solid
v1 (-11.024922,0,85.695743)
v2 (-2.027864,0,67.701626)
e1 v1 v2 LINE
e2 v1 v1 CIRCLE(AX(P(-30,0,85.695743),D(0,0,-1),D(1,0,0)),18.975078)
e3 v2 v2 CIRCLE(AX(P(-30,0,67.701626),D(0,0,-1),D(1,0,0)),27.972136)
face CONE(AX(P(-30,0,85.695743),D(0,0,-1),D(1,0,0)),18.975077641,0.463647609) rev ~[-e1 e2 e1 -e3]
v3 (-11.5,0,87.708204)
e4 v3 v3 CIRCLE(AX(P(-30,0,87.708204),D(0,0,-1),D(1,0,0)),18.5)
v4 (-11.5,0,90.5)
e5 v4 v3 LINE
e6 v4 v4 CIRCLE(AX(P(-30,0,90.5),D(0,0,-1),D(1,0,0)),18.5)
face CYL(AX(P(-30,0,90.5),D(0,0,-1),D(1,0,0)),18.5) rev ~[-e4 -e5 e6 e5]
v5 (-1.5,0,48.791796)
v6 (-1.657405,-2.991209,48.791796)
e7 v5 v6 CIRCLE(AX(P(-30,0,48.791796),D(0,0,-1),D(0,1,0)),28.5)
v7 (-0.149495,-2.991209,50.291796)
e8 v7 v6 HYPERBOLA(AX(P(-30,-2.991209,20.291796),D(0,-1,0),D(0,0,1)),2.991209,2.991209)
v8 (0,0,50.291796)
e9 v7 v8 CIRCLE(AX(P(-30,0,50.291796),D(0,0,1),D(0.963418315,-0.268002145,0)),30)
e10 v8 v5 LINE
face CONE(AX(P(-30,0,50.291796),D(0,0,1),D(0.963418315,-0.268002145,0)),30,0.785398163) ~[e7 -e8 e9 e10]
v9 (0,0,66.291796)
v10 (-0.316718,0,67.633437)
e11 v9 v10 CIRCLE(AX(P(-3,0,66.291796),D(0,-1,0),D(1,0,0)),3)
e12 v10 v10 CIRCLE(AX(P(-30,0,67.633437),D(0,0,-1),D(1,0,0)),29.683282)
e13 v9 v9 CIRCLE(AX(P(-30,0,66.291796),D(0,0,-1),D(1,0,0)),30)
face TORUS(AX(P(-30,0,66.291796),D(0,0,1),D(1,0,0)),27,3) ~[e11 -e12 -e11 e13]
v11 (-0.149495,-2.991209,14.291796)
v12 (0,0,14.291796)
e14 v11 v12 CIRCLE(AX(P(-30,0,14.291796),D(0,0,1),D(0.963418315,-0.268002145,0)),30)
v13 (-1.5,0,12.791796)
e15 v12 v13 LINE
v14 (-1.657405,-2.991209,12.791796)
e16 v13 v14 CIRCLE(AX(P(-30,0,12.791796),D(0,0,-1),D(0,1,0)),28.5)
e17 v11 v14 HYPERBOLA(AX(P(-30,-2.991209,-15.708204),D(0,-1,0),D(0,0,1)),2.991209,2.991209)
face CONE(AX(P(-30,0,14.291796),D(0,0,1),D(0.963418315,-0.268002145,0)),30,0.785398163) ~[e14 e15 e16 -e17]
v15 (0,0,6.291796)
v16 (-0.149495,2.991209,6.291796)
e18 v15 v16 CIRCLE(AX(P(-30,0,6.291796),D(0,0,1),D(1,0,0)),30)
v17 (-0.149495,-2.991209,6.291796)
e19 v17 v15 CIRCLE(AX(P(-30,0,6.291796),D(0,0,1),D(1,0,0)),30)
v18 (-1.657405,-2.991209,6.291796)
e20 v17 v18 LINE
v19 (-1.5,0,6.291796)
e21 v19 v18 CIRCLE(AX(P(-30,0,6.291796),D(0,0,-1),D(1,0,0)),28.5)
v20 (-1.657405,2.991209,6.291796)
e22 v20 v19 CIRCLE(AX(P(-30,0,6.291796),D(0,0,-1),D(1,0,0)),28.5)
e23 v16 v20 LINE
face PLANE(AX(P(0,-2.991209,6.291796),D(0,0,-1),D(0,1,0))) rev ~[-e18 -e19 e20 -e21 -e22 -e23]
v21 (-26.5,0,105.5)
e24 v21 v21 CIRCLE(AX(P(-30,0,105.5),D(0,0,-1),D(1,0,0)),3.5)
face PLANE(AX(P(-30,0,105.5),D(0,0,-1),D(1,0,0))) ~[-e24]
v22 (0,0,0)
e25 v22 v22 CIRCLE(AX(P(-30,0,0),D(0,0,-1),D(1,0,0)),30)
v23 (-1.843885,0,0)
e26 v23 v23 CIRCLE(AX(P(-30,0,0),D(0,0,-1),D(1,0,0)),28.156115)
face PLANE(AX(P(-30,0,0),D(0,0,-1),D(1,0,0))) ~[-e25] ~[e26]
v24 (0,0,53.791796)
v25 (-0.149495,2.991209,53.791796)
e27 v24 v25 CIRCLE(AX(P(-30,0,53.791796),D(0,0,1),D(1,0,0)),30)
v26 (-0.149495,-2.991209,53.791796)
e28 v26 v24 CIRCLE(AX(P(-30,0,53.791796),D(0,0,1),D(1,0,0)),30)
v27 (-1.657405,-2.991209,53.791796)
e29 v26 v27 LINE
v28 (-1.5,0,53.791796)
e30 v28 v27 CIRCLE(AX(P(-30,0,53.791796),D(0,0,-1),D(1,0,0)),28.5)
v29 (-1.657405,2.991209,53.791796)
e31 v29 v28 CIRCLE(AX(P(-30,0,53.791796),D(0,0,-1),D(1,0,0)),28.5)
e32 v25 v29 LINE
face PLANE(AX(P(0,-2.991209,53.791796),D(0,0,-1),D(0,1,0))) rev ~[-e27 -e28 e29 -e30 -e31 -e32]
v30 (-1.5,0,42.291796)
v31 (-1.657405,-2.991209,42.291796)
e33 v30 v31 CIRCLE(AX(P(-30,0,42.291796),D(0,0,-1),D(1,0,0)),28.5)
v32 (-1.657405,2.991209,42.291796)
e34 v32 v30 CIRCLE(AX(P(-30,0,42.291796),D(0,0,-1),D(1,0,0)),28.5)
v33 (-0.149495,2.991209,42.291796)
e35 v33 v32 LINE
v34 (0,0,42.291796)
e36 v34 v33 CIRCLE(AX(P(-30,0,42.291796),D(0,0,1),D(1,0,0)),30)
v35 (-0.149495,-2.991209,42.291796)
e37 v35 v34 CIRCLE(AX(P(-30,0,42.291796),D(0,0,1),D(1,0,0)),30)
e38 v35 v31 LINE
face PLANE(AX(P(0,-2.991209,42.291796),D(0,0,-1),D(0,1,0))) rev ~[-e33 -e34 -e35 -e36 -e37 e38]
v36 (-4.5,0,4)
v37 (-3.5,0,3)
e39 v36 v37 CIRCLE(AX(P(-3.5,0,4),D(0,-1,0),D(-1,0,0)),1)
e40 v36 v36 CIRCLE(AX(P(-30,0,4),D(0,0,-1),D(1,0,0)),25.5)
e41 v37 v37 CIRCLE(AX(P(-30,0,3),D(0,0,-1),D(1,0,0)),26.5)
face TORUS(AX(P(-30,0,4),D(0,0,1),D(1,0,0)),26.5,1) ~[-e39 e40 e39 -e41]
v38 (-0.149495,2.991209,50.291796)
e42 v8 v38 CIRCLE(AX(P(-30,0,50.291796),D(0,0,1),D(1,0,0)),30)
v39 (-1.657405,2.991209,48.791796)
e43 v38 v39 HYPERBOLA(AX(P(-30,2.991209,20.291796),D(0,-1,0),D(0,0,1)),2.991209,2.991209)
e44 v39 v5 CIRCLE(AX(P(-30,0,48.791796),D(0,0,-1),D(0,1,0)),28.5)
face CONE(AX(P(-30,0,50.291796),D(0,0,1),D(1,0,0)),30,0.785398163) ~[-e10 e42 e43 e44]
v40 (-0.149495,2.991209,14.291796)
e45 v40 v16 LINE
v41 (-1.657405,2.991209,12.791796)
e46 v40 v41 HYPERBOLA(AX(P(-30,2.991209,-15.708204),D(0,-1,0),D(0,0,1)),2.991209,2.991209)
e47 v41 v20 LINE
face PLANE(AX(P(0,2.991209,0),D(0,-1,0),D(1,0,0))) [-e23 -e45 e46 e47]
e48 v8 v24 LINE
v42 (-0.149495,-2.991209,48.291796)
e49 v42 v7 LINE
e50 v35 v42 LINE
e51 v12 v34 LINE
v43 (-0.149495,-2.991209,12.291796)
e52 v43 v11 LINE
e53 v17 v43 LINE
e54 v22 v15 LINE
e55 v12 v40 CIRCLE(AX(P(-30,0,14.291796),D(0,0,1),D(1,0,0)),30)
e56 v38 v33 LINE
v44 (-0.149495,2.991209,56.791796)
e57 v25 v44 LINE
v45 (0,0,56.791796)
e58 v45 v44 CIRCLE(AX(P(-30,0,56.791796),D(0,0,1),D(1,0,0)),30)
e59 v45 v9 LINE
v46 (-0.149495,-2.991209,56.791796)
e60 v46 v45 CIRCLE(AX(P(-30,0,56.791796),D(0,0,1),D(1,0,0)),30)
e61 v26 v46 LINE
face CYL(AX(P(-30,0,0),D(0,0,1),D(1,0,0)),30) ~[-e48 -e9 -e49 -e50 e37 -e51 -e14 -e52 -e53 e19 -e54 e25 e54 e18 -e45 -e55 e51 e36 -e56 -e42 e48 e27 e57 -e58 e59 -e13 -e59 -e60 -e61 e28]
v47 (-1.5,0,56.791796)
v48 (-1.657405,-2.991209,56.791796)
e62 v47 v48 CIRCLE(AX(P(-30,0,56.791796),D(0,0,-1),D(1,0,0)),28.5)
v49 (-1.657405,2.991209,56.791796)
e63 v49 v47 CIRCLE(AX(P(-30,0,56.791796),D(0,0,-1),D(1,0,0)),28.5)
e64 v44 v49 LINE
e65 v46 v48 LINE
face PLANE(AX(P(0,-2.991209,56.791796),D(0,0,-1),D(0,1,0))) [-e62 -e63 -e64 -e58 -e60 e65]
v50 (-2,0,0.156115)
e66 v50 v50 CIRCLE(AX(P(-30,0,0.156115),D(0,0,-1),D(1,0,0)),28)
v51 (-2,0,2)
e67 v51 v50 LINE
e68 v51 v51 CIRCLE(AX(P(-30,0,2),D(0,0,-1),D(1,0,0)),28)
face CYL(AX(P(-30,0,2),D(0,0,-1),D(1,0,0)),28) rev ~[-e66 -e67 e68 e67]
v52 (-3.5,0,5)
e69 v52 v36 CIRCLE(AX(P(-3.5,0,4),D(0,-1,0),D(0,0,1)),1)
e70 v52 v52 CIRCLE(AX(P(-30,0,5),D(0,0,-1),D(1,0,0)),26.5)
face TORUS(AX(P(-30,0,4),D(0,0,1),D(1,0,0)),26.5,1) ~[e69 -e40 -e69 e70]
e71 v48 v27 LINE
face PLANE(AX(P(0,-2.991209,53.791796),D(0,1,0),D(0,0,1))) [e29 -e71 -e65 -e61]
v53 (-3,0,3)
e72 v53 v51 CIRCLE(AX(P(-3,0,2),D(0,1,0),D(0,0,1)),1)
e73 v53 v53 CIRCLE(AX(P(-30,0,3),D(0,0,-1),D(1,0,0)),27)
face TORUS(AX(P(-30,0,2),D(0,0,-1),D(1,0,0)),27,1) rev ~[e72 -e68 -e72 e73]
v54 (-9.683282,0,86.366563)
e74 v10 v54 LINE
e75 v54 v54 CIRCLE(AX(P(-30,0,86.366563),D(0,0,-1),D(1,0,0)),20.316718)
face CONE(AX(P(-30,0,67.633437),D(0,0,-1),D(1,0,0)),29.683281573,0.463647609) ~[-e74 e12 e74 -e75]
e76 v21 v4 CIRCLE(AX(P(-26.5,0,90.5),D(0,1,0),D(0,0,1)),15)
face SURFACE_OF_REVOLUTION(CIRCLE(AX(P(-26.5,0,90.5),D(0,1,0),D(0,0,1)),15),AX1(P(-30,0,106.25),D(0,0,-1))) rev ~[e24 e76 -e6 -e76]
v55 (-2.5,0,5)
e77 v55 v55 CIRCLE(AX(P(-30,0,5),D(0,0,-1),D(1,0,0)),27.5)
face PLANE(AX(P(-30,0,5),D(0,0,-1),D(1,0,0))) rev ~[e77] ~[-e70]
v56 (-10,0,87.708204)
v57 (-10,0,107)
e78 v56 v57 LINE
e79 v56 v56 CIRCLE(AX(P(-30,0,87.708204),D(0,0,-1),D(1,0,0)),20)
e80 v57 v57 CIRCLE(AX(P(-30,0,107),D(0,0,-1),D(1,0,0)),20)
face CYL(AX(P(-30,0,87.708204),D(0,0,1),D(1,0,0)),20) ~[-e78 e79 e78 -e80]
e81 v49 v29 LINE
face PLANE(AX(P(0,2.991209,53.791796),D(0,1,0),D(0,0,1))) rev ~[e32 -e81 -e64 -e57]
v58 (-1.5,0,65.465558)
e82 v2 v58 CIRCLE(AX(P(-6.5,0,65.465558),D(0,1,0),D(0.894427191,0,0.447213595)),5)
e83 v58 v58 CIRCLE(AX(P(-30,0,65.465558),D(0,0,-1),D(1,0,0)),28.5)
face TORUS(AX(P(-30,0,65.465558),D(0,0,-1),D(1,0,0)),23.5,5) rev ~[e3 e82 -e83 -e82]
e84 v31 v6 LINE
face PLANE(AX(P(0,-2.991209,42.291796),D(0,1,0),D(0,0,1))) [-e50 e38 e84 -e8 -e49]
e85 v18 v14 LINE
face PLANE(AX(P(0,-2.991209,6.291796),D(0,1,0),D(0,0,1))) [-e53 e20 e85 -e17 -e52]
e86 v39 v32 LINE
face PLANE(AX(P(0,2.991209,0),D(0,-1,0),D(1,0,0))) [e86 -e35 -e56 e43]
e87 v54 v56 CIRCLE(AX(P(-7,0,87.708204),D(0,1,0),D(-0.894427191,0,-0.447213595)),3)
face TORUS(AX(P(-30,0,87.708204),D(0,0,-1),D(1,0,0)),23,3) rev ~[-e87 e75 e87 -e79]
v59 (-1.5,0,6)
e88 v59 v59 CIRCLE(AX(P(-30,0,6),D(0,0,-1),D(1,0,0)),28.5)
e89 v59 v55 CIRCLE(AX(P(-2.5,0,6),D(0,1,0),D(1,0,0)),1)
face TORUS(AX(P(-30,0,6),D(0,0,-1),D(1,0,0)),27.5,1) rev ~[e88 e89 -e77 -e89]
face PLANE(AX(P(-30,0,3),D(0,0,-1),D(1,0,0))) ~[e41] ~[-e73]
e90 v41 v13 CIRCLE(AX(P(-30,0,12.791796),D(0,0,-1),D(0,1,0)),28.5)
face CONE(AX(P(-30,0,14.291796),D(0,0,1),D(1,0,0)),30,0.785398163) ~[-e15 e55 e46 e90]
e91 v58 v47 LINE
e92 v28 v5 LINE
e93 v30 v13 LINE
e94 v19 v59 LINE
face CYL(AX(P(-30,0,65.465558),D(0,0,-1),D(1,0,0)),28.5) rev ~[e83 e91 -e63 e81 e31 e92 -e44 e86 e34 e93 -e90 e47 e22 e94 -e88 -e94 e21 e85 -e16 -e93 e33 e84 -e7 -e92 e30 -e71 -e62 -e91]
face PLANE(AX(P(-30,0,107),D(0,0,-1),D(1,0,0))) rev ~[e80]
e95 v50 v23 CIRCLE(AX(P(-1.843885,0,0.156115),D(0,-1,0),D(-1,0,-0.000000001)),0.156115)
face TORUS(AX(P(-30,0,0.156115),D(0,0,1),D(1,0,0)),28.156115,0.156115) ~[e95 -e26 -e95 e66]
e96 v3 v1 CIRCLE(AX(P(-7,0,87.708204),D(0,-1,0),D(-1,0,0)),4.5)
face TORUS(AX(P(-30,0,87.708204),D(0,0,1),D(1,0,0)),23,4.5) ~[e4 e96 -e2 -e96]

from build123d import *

# Parameters (mm, degrees)
F2_W         = 5.9824174088
F2_H         = 6
F2_H_2       = 3
F3_DEPTH     = 25
F4_T4_ANGLE  = 15.5454173813
F4_T9_ANGLE  = 15.5454173813
F4_T14_ANGLE = 15.5454173813
F4_T19_ANGLE = 15.5454173813


# Not quite as in the source:
# - a fillet or chamfer that OpenCascade refuses, or shapes differently, is made with other operations: its cross-section is extruded or revolved along the edge and cut away or added


with BuildPart() as f1:
    # F0 (on Front) → F1 (revolve)
    with BuildSketch(Plane.XZ):
        with BuildLine():
            Line((-1.8438853237, 0), (0, 0))
            Line((0, 0), (0, 66.2917960675))
            ThreePointArc((0, 66.2917960675), (-0.0802530316, 66.9810548291), (-0.316718427, 67.633436854))
            Line((-0.316718427, 67.633436854), (-9.683281573, 86.366563146))
            ThreePointArc((-9.683281573, 86.366563146), (-9.9197469684, 87.0189451709), (-10, 87.7082039325))
            Line((-10, 87.7082039325), (-10, 107))
            Line((-10, 107), (-30, 107))
            Line((-30, 107), (-30, 105.5))
            Line((-30, 105.5), (-26.5, 105.5))
            ThreePointArc((-26.5, 105.5), (-15.8933982822, 101.1066017178), (-11.5, 90.5))
            Line((-11.5, 90.5), (-11.5, 87.7082039325))
            ThreePointArc((-11.5, 87.7082039325), (-11.3796204526, 86.67431579), (-11.0249223595, 85.6957427527))
            Line((-11.0249223595, 85.6957427527), (-2.027864045, 67.7016261238))
            ThreePointArc((-2.027864045, 67.7016261238), (-1.6337550527, 66.614322749), (-1.5, 65.4655581463))
            Line((-1.5, 65.4655581463), (-1.5, 6))
            ThreePointArc((-1.5, 6), (-1.7928932188, 5.2928932188), (-2.5, 5))
            Line((-2.5, 5), (-3.5, 5))
            ThreePointArc((-3.5, 5), (-4.2071067812, 4.7071067812), (-4.5, 4))
            ThreePointArc((-4.5, 4), (-4.2071067812, 3.2928932188), (-3.5, 3))
            Line((-3.5, 3), (-3, 3))
            ThreePointArc((-3, 3), (-2.2928932188, 2.7071067812), (-2, 2))
            Line((-2, 2), (-2, 0.1561146763))
            ThreePointArc((-2, 0.1561146763), (-1.9542750699, 0.0457249301), (-1.8438853237, 0))
        make_face()
    revolve(axis=Axis((-30, 0, 106.25), (0, 0, -1)))

    # F2 (on Right) → F3 (cut)
    with BuildSketch(Plane.YZ):
        with Locations((0, 9.2917960675)):
            Rectangle(F2_W, F2_H)
        with Locations((0, 45.2917960675)):
            Rectangle(F2_W, F2_H)
        with Locations((0, 55.2917960675)):
            Rectangle(F2_W, F2_H_2)
    extrude(amount=-F3_DEPTH, mode=Mode.SUBTRACT)

    # F4: chamfer of 2 on 4 edges, made by hand


with BuildPart() as f4_tool2:
    # F4_s3 → F4_t4 (revolve)
    with BuildSketch(Plane(origin=(-2.1547544976, -7.7459452608, 0), x_dir=(0, 0, 1), z_dir=(-0.2680021454, -0.9634183152, 0))):
        Polygon((50.2917960675, -1.0974505437), (48.2917960675, 0.9025494563), (48.2917960675, -1.0974505437), align=None)
    revolve(axis=Axis((-30, 0, 48.2917960675), (0, 0, 1)), revolution_arc=F4_T4_ANGLE)

    split(bisect_by=Plane.XZ.offset(2.9912087044), keep=Keep.BOTTOM)


with BuildPart() as f1_1:
    add(f1.part)

    # F4_t1: cut F4_tool2
    add(f4_tool2.part, mode=Mode.SUBTRACT)


with BuildPart() as f4_tool7:
    # F4_s8 → F4_t9 (revolve)
    with BuildSketch(Plane.XZ):
        Polygon((0, 50.2917960675), (-2, 48.2917960675), (0, 48.2917960675), align=None)
    revolve(axis=Axis((-30, 0, 48.2917960675), (0, 0, 1)), revolution_arc=F4_T9_ANGLE)

    split(bisect_by=Plane.XZ.offset(-2.9912087044), keep=Keep.TOP)


with BuildPart() as f1_2:
    add(f1_1.part)

    # F4_t6: cut F4_tool7
    add(f4_tool7.part, mode=Mode.SUBTRACT)


with BuildPart() as f4_tool12:
    # F4_s13 → F4_t14 (revolve)
    with BuildSketch(Plane(origin=(-2.1547544976, -7.7459452608, 0), x_dir=(0, 0, 1), z_dir=(-0.2680021454, -0.9634183152, 0))):
        Polygon((14.2917960675, -1.0974505437), (12.2917960675, 0.9025494563), (12.2917960675, -1.0974505437), align=None)
    revolve(axis=Axis((-30, 0, 12.2917960675), (0, 0, 1)), revolution_arc=F4_T14_ANGLE)

    split(bisect_by=Plane.XZ.offset(2.9912087044), keep=Keep.BOTTOM)


with BuildPart() as f1_3:
    add(f1_2.part)

    # F4_t11: cut F4_tool12
    add(f4_tool12.part, mode=Mode.SUBTRACT)


with BuildPart() as f4_tool17:
    # F4_s18 → F4_t19 (revolve)
    with BuildSketch(Plane.XZ):
        Polygon((0, 14.2917960675), (-2, 12.2917960675), (0, 12.2917960675), align=None)
    revolve(axis=Axis((-30, 0, 12.2917960675), (0, 0, 1)), revolution_arc=F4_T19_ANGLE)

    split(bisect_by=Plane.XZ.offset(-2.9912087044), keep=Keep.TOP)


with BuildPart() as f1_4:
    add(f1_3.part)

    # F4_t16: cut F4_tool17
    add(f4_tool17.part, mode=Mode.SUBTRACT)


solid = f1_4.part
